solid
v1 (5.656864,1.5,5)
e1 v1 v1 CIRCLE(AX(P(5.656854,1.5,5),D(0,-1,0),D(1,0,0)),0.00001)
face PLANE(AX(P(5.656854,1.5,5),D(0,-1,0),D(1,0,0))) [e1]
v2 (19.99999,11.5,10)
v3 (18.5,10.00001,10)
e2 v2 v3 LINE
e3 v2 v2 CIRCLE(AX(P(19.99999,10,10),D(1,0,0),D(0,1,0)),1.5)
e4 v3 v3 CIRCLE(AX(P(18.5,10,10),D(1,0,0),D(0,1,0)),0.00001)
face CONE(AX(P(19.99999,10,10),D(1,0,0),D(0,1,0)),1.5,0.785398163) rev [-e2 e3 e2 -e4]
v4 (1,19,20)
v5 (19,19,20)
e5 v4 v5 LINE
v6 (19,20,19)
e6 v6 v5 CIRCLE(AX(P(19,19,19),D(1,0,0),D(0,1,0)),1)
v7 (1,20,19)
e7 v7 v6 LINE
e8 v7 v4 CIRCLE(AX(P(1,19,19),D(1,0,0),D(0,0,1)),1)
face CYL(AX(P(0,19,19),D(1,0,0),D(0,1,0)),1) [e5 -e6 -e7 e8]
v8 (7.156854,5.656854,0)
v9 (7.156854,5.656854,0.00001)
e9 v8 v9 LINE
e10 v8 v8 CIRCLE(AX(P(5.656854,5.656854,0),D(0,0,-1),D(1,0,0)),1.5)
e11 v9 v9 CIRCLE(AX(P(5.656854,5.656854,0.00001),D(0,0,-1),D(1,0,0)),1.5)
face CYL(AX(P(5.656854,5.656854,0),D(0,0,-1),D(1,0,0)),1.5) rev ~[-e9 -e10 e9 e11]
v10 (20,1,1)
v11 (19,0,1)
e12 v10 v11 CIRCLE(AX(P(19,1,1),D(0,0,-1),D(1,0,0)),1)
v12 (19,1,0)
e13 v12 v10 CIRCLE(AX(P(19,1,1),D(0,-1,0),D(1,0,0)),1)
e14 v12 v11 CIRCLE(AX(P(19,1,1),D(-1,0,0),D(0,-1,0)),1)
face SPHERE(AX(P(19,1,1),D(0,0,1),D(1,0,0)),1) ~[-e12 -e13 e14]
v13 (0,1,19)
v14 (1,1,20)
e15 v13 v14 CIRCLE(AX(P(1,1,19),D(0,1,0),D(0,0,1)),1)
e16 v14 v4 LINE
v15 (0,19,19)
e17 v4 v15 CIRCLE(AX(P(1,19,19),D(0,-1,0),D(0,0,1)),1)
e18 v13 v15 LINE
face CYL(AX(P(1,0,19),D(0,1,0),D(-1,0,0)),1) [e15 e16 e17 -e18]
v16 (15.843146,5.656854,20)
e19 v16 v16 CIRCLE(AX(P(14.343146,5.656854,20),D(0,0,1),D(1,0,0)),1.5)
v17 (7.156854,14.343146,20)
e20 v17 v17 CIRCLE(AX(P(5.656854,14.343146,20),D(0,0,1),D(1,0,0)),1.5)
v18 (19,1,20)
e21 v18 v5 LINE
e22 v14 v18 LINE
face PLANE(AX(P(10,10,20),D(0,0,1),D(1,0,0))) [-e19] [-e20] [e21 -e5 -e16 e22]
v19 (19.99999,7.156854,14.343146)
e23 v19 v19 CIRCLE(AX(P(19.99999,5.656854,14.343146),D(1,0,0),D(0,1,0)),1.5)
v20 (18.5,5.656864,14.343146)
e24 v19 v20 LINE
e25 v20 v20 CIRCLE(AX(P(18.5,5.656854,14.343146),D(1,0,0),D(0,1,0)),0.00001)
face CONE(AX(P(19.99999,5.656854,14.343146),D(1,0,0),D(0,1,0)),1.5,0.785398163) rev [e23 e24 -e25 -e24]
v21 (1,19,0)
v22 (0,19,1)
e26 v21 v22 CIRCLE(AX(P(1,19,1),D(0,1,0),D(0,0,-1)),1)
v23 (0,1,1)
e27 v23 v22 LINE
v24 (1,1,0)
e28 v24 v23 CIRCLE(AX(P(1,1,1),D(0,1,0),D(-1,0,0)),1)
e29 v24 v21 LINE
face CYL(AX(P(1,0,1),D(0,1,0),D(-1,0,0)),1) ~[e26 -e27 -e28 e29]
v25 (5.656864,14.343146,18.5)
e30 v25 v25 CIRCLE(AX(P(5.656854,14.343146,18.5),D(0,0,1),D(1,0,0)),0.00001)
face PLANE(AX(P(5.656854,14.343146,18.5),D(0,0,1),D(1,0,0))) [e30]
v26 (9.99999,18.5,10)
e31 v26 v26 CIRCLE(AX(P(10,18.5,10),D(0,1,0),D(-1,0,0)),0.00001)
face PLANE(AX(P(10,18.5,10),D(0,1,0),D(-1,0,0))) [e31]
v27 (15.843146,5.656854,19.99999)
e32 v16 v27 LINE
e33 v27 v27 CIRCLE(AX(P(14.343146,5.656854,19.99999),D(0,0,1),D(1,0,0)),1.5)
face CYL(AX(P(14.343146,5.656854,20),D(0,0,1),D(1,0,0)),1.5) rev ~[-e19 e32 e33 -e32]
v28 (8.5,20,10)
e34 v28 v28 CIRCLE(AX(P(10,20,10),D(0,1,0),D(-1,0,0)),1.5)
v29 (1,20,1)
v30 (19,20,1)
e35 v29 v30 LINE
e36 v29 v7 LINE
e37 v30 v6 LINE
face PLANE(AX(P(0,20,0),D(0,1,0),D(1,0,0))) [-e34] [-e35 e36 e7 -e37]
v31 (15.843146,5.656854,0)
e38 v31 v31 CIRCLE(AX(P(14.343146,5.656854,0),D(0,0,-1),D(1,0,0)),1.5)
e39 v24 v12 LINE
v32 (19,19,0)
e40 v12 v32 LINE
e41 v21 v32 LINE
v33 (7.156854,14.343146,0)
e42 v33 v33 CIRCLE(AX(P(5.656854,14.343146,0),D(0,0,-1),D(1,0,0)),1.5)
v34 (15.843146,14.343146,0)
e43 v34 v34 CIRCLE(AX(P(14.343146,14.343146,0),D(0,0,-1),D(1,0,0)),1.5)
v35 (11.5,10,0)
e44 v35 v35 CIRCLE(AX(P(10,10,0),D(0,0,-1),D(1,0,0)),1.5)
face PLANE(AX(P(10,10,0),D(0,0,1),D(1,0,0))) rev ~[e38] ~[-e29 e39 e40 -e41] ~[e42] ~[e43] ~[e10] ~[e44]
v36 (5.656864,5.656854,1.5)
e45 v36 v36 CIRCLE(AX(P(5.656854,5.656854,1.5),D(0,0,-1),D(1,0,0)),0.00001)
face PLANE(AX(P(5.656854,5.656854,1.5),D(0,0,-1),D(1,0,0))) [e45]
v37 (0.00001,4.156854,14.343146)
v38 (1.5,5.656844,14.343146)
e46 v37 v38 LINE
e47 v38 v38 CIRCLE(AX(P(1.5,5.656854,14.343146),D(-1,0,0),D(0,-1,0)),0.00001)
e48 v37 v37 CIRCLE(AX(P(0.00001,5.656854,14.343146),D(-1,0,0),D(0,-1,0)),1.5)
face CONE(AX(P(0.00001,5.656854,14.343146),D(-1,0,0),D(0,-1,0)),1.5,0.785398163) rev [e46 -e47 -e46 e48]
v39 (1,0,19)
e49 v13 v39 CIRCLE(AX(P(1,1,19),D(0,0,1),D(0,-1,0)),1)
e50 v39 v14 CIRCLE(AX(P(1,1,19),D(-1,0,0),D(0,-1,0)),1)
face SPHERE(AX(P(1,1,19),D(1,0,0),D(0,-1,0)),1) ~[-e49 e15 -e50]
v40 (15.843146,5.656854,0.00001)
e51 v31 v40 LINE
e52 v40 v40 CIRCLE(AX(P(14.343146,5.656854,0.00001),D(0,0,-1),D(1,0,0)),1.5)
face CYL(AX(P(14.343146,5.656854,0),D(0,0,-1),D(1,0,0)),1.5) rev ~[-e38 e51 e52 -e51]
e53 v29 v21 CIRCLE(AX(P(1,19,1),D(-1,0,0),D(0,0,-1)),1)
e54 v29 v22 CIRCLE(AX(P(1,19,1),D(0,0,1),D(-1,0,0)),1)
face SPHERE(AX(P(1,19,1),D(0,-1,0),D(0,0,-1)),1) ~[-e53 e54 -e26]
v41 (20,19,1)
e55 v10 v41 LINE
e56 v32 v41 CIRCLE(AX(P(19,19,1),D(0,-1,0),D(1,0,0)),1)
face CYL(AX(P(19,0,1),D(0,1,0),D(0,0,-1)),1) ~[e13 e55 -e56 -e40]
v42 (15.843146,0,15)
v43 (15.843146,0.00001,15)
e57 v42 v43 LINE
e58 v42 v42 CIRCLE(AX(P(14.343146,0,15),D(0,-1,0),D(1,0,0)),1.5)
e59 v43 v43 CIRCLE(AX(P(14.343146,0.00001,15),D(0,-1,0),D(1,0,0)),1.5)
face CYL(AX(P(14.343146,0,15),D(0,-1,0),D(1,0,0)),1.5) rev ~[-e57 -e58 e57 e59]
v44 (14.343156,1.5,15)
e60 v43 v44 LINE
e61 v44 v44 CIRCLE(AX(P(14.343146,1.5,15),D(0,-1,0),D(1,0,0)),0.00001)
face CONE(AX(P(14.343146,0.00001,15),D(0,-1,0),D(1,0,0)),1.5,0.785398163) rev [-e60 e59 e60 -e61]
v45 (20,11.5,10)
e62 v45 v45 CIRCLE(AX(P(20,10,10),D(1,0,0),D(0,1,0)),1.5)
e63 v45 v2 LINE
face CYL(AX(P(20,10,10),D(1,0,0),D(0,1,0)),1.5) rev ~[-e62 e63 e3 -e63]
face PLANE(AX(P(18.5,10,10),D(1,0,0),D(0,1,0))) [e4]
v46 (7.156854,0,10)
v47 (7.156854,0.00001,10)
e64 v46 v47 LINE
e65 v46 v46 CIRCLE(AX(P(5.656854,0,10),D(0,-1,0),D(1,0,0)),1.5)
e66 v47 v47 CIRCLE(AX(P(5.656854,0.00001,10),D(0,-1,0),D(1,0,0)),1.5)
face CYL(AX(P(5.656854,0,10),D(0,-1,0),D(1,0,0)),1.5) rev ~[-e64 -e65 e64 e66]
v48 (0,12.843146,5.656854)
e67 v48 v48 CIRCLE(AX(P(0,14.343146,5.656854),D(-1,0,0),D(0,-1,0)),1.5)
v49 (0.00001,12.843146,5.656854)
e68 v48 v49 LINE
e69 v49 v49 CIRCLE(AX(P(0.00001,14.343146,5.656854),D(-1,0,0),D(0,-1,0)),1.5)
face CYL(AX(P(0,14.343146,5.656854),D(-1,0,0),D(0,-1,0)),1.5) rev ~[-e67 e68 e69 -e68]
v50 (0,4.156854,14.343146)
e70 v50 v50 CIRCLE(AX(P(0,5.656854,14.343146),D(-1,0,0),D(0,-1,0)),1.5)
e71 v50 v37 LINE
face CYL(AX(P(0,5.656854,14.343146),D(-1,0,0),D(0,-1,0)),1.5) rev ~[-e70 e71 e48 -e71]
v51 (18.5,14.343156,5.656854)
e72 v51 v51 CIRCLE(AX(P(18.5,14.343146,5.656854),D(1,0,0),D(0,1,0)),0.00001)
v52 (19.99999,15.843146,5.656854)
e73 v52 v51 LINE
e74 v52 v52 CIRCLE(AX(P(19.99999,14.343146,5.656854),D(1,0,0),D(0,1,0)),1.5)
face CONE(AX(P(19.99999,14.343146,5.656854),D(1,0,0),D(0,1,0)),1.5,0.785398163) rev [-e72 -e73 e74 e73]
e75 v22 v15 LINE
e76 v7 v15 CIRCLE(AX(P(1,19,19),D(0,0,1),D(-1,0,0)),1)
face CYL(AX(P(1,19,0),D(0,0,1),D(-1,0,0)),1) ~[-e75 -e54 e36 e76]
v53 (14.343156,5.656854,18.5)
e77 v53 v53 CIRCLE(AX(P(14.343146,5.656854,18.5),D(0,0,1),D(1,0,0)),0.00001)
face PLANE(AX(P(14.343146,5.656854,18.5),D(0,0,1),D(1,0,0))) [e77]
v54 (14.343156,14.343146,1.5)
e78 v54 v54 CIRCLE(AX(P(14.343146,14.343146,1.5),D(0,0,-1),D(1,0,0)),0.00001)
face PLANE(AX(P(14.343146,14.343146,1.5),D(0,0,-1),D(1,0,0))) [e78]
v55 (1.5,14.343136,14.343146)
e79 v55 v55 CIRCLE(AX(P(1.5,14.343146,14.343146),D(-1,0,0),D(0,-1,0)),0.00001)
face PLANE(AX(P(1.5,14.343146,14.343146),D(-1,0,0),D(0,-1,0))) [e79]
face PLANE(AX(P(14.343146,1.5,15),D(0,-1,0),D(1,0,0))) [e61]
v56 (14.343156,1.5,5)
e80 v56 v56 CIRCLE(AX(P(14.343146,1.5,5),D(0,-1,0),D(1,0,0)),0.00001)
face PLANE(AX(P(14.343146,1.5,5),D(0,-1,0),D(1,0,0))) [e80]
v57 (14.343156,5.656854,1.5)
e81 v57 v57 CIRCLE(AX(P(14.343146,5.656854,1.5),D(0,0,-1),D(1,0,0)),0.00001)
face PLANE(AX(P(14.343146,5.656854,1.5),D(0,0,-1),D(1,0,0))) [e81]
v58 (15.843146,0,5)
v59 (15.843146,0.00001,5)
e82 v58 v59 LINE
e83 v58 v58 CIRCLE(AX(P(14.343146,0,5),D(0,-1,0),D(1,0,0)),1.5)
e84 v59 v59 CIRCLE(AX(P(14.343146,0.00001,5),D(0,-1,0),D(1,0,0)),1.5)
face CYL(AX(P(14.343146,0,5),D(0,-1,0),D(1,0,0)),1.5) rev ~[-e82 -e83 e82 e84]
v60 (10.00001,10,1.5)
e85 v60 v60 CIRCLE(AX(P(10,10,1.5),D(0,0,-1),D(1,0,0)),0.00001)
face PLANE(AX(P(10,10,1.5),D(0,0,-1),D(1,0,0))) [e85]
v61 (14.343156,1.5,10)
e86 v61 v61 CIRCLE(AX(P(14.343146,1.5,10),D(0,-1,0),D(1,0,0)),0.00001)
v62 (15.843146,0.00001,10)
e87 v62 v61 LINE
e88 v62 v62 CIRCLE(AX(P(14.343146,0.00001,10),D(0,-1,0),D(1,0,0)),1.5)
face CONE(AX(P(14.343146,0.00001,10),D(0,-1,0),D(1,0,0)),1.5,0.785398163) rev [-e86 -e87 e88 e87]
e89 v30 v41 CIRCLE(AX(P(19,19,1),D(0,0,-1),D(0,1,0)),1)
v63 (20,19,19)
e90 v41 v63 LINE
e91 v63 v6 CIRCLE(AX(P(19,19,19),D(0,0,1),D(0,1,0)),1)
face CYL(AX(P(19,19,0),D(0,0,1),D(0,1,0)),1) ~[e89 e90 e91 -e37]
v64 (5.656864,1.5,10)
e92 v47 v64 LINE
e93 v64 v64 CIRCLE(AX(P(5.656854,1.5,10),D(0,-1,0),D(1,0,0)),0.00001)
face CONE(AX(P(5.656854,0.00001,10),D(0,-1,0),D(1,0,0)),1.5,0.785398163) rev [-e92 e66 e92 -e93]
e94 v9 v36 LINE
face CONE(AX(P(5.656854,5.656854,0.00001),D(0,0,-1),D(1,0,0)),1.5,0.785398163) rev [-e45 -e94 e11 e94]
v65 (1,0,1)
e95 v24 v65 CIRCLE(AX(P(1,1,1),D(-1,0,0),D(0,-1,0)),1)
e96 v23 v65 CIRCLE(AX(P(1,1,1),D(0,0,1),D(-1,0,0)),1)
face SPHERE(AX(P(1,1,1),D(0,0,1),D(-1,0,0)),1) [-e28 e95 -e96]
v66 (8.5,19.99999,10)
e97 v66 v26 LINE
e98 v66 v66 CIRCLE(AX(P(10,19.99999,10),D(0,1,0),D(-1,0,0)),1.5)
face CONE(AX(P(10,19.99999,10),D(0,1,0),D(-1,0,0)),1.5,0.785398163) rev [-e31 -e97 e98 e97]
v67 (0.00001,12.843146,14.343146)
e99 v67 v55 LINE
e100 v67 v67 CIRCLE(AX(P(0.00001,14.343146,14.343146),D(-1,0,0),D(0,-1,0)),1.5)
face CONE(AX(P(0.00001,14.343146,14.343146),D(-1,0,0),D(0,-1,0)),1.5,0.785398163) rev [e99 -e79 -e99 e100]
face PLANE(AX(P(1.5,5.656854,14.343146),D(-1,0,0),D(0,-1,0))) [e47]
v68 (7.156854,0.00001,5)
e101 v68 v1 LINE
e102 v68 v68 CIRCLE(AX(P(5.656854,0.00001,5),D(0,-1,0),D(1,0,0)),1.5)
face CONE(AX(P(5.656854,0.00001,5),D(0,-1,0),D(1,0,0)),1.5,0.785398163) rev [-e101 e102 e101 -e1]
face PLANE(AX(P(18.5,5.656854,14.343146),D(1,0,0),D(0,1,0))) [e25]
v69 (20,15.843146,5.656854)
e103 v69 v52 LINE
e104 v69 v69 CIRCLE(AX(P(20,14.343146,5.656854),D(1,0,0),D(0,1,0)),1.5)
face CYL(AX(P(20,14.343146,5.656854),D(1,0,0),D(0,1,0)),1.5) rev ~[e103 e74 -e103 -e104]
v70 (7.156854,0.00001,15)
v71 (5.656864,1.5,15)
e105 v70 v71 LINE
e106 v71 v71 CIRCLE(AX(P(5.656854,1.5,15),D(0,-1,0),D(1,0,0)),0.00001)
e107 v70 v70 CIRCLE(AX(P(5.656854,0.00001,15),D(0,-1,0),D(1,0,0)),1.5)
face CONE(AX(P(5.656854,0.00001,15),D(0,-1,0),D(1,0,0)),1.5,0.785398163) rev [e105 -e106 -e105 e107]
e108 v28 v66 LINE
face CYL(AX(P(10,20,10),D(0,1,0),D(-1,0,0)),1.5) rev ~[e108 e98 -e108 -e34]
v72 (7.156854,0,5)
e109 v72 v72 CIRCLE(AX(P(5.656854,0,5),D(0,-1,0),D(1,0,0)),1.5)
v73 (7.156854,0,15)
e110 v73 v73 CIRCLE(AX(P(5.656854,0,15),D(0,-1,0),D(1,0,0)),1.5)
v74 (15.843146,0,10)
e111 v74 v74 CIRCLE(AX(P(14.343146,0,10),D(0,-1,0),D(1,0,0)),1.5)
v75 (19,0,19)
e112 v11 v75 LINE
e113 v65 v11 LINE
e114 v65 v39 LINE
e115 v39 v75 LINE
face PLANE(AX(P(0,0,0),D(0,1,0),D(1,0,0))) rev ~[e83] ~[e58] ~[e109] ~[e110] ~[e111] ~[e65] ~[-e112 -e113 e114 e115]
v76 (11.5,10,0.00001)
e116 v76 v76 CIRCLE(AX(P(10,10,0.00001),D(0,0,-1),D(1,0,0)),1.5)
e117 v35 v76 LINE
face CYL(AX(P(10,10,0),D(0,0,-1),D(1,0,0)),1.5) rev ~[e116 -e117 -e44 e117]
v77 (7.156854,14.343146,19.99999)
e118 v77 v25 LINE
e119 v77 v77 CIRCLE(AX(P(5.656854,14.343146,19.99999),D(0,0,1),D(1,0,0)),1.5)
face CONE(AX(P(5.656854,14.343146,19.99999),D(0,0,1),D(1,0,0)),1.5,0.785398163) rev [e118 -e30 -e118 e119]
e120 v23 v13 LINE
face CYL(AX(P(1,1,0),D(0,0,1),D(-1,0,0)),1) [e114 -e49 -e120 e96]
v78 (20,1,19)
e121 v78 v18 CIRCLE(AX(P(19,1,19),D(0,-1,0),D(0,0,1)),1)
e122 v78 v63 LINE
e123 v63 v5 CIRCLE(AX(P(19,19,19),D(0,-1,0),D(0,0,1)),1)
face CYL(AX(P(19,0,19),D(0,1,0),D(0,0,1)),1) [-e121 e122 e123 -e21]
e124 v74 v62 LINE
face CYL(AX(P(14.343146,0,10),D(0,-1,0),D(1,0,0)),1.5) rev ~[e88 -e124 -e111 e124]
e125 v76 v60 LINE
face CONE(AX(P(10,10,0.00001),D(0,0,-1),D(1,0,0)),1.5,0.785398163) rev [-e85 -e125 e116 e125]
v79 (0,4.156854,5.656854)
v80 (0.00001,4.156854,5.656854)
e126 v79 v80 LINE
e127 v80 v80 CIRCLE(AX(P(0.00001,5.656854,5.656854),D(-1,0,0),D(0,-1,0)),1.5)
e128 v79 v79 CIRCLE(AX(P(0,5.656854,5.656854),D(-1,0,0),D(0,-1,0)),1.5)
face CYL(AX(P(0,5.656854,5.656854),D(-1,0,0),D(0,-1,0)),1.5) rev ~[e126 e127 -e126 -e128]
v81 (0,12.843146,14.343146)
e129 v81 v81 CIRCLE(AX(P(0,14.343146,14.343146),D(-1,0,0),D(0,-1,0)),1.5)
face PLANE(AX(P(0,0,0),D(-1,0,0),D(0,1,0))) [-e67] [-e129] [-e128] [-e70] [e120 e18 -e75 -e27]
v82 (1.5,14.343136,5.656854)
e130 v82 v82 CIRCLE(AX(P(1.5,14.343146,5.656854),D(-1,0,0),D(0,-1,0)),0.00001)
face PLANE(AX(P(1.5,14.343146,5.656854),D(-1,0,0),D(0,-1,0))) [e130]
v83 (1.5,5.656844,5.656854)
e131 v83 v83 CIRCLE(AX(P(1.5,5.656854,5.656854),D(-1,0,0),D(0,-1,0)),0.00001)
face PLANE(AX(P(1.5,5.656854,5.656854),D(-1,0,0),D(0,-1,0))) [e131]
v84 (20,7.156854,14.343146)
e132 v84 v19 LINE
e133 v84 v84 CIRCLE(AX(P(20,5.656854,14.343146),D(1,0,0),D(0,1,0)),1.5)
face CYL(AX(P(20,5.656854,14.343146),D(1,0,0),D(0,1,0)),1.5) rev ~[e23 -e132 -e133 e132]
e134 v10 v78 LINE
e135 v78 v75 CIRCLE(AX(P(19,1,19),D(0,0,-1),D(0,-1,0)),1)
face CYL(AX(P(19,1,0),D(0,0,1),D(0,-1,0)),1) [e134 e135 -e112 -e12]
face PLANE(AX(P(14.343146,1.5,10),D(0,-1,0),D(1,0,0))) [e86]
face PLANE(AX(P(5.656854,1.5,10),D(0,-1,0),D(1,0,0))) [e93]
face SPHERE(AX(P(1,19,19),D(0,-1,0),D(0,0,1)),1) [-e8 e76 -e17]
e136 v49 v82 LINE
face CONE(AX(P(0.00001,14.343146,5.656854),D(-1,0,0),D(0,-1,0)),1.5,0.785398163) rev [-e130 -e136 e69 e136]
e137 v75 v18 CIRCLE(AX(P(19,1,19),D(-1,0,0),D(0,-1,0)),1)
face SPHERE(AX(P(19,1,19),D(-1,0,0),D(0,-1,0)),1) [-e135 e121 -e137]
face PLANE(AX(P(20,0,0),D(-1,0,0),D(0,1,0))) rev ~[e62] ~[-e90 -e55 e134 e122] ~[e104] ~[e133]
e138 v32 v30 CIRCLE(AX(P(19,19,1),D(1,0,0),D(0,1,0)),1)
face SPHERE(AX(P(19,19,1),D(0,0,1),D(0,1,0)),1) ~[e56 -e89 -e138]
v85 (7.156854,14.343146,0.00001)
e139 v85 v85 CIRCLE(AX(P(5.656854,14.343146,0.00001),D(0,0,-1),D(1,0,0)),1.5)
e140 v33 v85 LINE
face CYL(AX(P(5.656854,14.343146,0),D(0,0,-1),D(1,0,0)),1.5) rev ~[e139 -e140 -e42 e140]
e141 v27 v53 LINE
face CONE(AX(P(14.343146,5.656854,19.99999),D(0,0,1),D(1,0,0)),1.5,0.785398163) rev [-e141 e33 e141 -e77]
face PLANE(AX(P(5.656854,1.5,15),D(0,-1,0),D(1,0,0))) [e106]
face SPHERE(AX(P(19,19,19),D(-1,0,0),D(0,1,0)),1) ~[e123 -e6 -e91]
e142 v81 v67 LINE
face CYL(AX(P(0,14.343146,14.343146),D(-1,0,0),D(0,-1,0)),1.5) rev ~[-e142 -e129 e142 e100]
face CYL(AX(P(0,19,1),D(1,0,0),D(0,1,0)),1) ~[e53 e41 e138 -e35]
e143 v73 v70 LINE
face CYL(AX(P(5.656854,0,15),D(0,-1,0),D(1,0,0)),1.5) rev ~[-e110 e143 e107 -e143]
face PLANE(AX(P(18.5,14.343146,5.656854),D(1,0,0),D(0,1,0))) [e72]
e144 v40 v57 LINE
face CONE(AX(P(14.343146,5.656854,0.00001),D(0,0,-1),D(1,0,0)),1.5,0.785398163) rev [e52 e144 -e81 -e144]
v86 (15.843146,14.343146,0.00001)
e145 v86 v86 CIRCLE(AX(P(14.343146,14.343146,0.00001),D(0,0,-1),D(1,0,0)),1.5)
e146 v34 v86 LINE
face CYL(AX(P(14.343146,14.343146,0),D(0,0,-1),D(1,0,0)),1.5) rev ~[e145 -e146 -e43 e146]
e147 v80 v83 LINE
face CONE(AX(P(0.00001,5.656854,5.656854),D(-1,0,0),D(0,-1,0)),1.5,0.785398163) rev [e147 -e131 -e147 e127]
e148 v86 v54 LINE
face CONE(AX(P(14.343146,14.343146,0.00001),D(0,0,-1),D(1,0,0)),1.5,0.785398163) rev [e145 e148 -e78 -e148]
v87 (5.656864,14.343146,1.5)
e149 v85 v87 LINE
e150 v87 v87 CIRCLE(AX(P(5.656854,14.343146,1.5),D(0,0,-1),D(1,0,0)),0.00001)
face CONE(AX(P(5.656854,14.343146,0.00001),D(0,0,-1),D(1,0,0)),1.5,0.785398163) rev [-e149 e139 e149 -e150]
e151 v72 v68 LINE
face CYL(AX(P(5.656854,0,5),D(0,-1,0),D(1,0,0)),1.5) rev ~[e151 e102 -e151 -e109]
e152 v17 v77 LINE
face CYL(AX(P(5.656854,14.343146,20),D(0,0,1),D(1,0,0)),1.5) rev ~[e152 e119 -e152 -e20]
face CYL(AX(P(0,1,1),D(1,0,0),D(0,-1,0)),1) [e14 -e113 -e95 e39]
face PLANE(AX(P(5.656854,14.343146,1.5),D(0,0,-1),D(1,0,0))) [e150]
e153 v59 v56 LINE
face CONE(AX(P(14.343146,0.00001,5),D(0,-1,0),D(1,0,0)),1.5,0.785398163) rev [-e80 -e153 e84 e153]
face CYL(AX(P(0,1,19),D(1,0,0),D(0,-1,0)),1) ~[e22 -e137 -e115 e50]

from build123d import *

# Parameters (mm, degrees)
F0_W      = 20
F0_H      = 20
F1_DEPTH  = 20
F2_R      = 1.5
F3_DEPTH  = 1.5
F4_R      = 1
F5_SIZE   = 1.49999
F6_R      = 1.5
F7_DEPTH  = 1.5
F8_SIZE   = 1.49999
F9_R      = 1.5
F10_DEPTH = 1.5
F11_SIZE  = 1.49999
F12_R     = 1.5
F13_DEPTH = 1.5
F14_SIZE  = 1.49999
F15_R     = 1.5
F16_DEPTH = 1.5
F17_SIZE  = 1.49999
F18_R     = 1.5
F19_DEPTH = 1.5
F20_SIZE  = 1.49999


# Not quite as in the source:
# - a fillet or chamfer is up to 0.001 mm smaller than in the source, because OpenCascade refuses the exact size


with BuildPart() as f1:
    # F0 (on Top) → F1 (new body)
    with BuildSketch(Plane.XY):
        with Locations((10, 10)):
            Rectangle(F0_W, F0_H)
    extrude(amount=F1_DEPTH)

    # F2 (on face) → F3 (cut)
    with BuildSketch(Plane.XY.offset(20)):
        with Locations((5.6568542495, 14.3431457505)):
            Circle(F2_R)
        with Locations((14.3431457505, 5.6568542495)):
            Circle(F2_R)
    extrude(amount=-F3_DEPTH, mode=Mode.SUBTRACT)

    # F4
    f4_edges = [f1.edges().sort_by_distance(p)[0] for p in [
        (10, 0, 20),
        (20, 0, 10),
        (0, 0, 10),
        (0, 10, 0),
        (0, 10, 20),
        (10, 20, 20),
        (20, 20, 10),
        (20, 10, 20),
        (10, 20, 0),
        (20, 10, 0),
        (0, 20, 10),
        (10, 0, 0),
    ]]
    fillet(f4_edges, radius=F4_R)

    # F5 (size 1.5 in the source; OpenCascade refuses exactly that, so slightly less here)
    f5_edges = [f1.edges().sort_by_distance(p)[0] for p in [
        (12.843146, 5.656854, 18.5),
        (4.156854, 14.343146, 18.5),
    ]]
    chamfer(f5_edges, length=F5_SIZE)

    # F6 (on face) → F7 (cut)
    with BuildSketch(Plane(origin=(0, 0, 0), x_dir=(1, 0, 0), z_dir=(0, 0, -1))):
        with Locations((5.6568542495, -5.6568542495)):
            Circle(F6_R)
        with Locations((14.3431457505, -5.6568542495)):
            Circle(F6_R)
        with Locations((14.3431457505, -14.3431457505)):
            Circle(F6_R)
        with Locations((5.6568542495, -14.3431457505)):
            Circle(F6_R)
        with Locations((10, -10)):
            Circle(F6_R)
    extrude(amount=-F7_DEPTH, mode=Mode.SUBTRACT)

    # F8 (size 1.5 in the source; OpenCascade refuses exactly that, so slightly less here)
    f8_edges = [f1.edges().sort_by_distance(p)[0] for p in [
        (4.156854, 5.656854, 1.5),
        (12.843146, 5.656854, 1.5),
        (8.5, 10, 1.5),
        (12.843146, 14.343146, 1.5),
        (4.156854, 14.343146, 1.5),
    ]]
    chamfer(f8_edges, length=F8_SIZE)

    # F9 (on face) → F10 (cut)
    with BuildSketch(Plane.YZ.offset(20)):
        with Locations((5.6568542495, 14.3431457505)):
            Circle(F9_R)
        with Locations((14.3431457505, 5.6568542495)):
            Circle(F9_R)
        with Locations((10, 10)):
            Circle(F9_R)
    extrude(amount=-F10_DEPTH, mode=Mode.SUBTRACT)

    # F11 (size 1.5 in the source; OpenCascade refuses exactly that, so slightly less here)
    f11_edges = [f1.edges().sort_by_distance(p)[0] for p in [
        (18.5, 4.156854, 14.343146),
        (18.5, 8.5, 10),
        (18.5, 12.843146, 5.656854),
    ]]
    chamfer(f11_edges, length=F11_SIZE)

    # F12 (on face) → F13 (cut)
    with BuildSketch(Plane(origin=(0, 20, 0), x_dir=(-1, 0, 0), z_dir=(0, 1, 0))):
        with Locations((-10, 10)):
            Circle(F12_R)
    extrude(amount=-F13_DEPTH, mode=Mode.SUBTRACT)

    # F14 (size 1.5 in the source; OpenCascade refuses exactly that, so slightly less here)
    f14_edges = [f1.edges().sort_by_distance(p)[0] for p in [
        (11.5, 18.5, 10),
    ]]
    chamfer(f14_edges, length=F14_SIZE)

    # F15 (on face) → F16 (cut)
    with BuildSketch(Plane(origin=(0, 0, 0), x_dir=(0, -1, 0), z_dir=(-1, 0, 0))):
        with Locations((-14.3431457505, 14.3431457505)):
            Circle(F15_R)
        with Locations((-5.6568542495, 14.3431457505)):
            Circle(F15_R)
        with Locations((-5.6568542495, 5.6568542495)):
            Circle(F15_R)
        with Locations((-14.3431457505, 5.6568542495)):
            Circle(F15_R)
    extrude(amount=-F16_DEPTH, mode=Mode.SUBTRACT)

    # F17 (size 1.5 in the source; OpenCascade refuses exactly that, so slightly less here)
    f17_edges = [f1.edges().sort_by_distance(p)[0] for p in [
        (1.5, 15.843146, 14.343146),
        (1.5, 7.156854, 14.343146),
        (1.5, 7.156854, 5.656854),
        (1.5, 15.843146, 5.656854),
    ]]
    chamfer(f17_edges, length=F17_SIZE)

    # F18 (on face) → F19 (cut)
    with BuildSketch(Plane.XZ):
        with Locations((5.6568542495, 10)):
            Circle(F18_R)
        with Locations((5.6568542495, 5)):
            Circle(F18_R)
        with Locations((14.3431457505, 10)):
            Circle(F18_R)
        with Locations((14.3431457505, 5)):
            Circle(F18_R)
        with Locations((5.6568542495, 15)):
            Circle(F18_R)
        with Locations((14.3431457505, 15)):
            Circle(F18_R)
    extrude(amount=-F19_DEPTH, mode=Mode.SUBTRACT)

    # F20 (size 1.5 in the source; OpenCascade refuses exactly that, so slightly less here)
    f20_edges = [f1.edges().sort_by_distance(p)[0] for p in [
        (4.156854, 1.5, 15),
        (12.843146, 1.5, 15),
        (12.843146, 1.5, 10),
        (4.156854, 1.5, 10),
        (12.843146, 1.5, 5),
        (4.156854, 1.5, 5),
    ]]
    chamfer(f20_edges, length=F20_SIZE)


solid = f1.part
